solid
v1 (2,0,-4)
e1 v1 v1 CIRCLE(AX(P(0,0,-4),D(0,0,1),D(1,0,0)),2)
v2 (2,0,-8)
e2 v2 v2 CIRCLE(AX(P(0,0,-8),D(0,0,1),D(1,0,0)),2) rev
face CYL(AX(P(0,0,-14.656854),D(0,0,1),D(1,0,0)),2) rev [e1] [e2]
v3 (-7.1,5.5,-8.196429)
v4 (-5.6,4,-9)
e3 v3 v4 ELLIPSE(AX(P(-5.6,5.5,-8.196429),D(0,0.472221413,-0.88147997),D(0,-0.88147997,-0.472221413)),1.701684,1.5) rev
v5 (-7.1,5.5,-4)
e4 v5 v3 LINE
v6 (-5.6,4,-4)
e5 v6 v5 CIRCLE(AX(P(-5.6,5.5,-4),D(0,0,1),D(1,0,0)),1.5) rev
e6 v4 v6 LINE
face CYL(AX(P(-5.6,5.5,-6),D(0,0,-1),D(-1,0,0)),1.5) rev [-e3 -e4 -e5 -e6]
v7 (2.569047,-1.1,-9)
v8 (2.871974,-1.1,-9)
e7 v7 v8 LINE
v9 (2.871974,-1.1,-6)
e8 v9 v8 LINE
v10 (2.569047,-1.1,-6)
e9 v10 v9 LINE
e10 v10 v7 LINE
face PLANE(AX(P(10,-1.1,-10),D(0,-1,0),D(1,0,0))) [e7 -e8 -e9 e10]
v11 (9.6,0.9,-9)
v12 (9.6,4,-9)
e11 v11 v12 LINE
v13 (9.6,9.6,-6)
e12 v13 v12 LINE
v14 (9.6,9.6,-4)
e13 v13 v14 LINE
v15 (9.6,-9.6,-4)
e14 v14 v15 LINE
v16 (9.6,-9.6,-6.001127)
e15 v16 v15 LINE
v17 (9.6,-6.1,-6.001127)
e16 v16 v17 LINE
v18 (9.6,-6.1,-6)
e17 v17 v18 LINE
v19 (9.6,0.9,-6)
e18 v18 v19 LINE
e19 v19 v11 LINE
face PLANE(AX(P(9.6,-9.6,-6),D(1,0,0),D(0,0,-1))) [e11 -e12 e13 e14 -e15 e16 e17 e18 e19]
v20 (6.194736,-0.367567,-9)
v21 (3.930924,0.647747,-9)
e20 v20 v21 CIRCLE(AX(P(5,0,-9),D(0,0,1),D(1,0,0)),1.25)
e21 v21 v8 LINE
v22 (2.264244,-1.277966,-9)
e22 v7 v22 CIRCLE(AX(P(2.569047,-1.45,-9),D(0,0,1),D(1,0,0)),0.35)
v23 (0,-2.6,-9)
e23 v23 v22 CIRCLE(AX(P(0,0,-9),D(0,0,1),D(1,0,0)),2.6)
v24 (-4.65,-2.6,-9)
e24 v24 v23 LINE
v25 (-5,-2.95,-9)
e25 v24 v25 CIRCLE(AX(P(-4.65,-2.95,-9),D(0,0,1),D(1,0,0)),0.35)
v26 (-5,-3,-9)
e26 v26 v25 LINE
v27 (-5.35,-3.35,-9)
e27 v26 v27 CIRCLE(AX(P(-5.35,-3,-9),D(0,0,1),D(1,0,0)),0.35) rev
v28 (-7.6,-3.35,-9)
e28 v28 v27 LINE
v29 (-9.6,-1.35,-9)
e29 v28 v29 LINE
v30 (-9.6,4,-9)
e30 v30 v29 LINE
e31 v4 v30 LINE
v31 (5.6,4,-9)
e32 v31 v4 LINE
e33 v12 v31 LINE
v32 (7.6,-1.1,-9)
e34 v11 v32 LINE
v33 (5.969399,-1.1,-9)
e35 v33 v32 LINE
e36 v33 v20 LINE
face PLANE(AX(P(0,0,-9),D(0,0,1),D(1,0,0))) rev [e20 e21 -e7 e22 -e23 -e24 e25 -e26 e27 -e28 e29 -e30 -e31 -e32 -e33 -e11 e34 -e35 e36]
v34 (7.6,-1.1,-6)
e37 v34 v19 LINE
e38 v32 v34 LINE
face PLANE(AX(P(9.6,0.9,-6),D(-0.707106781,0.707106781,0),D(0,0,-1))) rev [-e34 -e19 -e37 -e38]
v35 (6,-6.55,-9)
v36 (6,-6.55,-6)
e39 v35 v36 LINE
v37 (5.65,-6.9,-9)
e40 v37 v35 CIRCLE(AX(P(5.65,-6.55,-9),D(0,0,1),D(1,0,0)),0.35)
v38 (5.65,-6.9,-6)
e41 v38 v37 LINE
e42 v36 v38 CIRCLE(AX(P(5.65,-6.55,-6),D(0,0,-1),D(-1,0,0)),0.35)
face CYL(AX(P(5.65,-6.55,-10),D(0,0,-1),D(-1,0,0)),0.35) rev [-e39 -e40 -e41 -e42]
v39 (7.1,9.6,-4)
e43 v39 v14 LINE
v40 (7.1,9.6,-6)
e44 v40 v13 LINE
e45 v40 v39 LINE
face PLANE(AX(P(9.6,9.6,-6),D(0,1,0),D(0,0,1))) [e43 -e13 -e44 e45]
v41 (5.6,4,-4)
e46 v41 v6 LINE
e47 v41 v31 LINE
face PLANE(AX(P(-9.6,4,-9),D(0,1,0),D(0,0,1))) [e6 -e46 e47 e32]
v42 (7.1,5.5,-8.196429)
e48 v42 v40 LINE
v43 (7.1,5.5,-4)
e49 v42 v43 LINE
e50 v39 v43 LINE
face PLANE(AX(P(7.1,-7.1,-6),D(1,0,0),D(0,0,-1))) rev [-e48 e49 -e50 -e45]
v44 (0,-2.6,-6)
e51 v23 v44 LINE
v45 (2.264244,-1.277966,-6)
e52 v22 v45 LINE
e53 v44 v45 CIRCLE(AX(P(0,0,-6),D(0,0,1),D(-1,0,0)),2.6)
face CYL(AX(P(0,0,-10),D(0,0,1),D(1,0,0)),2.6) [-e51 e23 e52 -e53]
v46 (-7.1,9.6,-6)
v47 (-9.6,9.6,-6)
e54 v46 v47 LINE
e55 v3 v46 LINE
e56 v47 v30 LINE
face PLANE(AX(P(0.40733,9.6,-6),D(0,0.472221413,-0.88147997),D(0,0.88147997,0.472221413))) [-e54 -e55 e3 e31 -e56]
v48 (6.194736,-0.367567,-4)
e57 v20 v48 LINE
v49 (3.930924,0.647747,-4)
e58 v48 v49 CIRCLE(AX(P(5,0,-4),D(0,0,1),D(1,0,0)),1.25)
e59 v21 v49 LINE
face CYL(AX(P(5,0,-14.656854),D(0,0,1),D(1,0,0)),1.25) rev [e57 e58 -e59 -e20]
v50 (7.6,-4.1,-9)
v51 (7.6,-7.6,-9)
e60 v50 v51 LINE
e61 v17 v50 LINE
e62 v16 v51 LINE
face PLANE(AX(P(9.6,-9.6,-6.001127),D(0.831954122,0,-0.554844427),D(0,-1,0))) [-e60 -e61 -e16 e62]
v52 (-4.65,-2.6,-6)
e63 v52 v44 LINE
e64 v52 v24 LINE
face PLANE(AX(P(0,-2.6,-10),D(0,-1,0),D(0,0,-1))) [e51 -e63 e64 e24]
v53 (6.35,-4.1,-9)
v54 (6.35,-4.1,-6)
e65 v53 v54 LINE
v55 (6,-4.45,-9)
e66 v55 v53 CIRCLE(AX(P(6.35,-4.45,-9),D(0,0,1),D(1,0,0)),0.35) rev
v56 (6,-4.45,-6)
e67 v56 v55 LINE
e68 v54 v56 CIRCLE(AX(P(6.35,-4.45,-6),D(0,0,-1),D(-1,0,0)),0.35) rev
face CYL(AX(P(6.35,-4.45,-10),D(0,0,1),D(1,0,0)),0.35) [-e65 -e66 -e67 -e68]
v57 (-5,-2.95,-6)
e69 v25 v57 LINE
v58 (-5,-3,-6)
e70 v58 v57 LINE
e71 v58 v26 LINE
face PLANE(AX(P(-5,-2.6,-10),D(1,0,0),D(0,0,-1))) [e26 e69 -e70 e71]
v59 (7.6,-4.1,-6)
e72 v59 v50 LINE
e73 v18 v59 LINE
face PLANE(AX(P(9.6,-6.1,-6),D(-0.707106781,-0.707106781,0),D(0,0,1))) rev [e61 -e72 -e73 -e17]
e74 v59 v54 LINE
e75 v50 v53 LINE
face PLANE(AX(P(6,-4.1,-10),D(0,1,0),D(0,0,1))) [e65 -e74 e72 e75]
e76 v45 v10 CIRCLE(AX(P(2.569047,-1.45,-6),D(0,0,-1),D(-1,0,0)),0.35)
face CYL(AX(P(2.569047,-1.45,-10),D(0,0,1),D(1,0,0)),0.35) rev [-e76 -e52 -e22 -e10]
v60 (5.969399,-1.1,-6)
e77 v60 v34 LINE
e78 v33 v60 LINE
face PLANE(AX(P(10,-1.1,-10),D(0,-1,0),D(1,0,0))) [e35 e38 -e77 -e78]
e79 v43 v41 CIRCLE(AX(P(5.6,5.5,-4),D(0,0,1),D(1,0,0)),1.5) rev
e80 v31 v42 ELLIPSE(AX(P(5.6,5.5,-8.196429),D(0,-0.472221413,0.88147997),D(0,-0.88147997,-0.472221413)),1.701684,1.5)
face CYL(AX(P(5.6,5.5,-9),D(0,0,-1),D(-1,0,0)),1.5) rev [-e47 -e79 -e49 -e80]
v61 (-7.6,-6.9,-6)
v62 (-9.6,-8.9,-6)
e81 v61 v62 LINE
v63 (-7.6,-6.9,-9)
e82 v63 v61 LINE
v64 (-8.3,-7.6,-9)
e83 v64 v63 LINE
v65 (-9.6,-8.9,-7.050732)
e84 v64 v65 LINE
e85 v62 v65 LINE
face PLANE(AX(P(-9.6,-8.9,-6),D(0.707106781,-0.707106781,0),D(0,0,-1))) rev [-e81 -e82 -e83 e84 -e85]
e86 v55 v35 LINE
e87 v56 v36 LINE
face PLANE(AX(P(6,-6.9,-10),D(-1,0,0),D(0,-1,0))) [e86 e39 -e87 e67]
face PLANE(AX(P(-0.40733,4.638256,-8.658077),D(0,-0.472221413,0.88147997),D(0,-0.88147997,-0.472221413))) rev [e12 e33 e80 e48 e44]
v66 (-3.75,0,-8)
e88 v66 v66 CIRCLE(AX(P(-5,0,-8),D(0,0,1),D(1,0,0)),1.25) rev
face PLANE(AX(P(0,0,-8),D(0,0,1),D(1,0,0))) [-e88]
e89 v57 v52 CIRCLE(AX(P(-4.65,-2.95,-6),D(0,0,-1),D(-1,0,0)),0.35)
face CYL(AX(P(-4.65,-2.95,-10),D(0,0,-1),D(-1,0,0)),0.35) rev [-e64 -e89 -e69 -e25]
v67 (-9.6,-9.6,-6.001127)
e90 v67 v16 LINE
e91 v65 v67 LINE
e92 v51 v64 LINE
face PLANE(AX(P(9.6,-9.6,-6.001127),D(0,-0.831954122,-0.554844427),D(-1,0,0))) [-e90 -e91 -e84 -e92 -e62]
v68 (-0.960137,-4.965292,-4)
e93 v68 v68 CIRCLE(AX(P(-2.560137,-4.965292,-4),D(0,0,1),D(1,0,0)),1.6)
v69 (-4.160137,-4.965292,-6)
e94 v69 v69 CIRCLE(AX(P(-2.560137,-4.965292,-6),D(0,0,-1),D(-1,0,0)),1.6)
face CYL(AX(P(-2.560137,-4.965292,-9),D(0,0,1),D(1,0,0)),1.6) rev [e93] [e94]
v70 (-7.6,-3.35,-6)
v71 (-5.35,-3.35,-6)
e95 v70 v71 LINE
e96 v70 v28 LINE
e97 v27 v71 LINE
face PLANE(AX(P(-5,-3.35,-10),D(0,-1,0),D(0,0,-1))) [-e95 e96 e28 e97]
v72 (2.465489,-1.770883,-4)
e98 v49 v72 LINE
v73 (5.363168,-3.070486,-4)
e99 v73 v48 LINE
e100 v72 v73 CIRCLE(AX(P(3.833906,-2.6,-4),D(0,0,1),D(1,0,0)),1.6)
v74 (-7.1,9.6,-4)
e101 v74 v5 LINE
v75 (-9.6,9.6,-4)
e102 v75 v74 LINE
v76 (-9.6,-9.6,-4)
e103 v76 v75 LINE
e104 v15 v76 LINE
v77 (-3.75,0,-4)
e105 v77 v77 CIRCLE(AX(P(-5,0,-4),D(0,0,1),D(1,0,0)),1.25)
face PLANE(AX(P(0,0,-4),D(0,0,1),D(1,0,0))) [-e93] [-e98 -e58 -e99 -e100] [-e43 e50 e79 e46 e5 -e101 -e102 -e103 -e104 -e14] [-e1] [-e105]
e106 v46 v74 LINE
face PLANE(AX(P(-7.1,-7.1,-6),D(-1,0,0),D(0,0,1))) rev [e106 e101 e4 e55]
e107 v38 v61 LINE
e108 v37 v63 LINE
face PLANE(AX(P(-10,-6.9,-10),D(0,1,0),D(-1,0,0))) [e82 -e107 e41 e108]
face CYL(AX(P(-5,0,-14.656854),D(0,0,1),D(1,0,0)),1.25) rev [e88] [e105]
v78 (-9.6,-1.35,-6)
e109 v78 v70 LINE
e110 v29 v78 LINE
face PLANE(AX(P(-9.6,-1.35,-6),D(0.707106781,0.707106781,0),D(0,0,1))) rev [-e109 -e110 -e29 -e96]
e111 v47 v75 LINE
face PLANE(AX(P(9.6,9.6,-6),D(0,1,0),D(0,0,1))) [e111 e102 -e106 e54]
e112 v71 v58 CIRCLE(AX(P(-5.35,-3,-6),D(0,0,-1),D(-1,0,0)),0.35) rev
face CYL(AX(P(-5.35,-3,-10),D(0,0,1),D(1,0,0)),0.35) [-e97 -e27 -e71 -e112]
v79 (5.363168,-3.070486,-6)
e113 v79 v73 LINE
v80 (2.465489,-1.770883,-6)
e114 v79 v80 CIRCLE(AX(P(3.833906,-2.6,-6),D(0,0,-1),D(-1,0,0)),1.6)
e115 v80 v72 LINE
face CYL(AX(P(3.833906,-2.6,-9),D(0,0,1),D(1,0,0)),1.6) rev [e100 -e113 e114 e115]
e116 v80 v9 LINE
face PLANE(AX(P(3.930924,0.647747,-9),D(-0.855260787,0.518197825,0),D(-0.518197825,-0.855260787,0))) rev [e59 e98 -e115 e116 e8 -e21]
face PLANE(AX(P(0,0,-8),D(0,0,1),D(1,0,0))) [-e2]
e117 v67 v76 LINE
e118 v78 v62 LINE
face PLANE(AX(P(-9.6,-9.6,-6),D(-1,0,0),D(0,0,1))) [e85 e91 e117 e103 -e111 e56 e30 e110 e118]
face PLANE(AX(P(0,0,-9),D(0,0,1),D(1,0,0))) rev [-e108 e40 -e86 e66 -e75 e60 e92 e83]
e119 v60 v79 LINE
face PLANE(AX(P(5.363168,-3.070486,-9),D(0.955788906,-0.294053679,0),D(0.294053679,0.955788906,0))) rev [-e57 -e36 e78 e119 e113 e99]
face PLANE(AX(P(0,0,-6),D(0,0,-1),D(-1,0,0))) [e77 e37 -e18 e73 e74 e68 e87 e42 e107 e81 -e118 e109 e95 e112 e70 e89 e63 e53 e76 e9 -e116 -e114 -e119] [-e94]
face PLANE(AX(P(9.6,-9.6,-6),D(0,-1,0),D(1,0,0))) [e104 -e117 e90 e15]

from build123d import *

# Parameters (mm, degrees)
OUTER_FRAME_EXTRUDE_DEPTH      = 5
OUTER_FRAME_EXTRUDE_DEPTH_BACK = 2
OUTSIDE_FRAME_W                = 19.2
OUTSIDE_FRAME_H                = 19.2
OUTSIDE_FRAME_W_2              = 14.2
OUTSIDE_FRAME_H_2              = 14.2
HOTSWAP_BASE_W                 = 19.2
HOTSWAP_BASE_H                 = 13.6
HOTSWAP_BASE_BLOCK_DEPTH       = 5
CUT_EXTRUDE4_DEPTH             = 17.288646353
CUT_EXTRUDE4_DEPTH_BACK        = 17.288646353
SKETCH1_W                      = 2
SKETCH1_H                      = 5.6
CUT_EXTRUDE1_DEPTH             = 4
SWITCH_PIN_HOLES_R             = 2
SWITCH_PIN_HOLES_R_2           = 1.25
SWITCH_HOLES_DEPTH             = 4
HOTSWAP_HOLES_R                = 1.6
CUT_EXTRUDE3_DEPTH             = 17.288646353
CHAMFER1_SIZE                  = 2
BOSS_EXTRUDE2_DEPTH            = 2.5
BOSS_EXTRUDE3_DEPTH            = 2.5
FILLET1_R                      = 0.35
FILLET2_R                      = 1.5
SPLIT1_START                   = -4
SPLIT1_OUTLINE_W               = 19.2
SPLIT1_OUTLINE_H               = 19.2
SPLIT1_OUTLINE_W_2             = 14.2
SPLIT1_OUTLINE_H_2             = 14.2
SPLIT1_DEPTH                   = 5
CHAMFER2_SIZE                  = 2
CHAMFER2_SIZE2                 = 2.998873489


# Read off the part's stored shape, not the designer's step: Split1
with BuildPart() as part:
    # Outside Frame → Outer Frame Extrude (new, two sides: drawn at the far end of the back side and taken through both)
    with BuildSketch(Plane.XY.offset(-4).offset(-OUTER_FRAME_EXTRUDE_DEPTH_BACK)):
        Rectangle(OUTSIDE_FRAME_W, OUTSIDE_FRAME_H)
        Rectangle(OUTSIDE_FRAME_W_2, OUTSIDE_FRAME_H_2, mode=Mode.SUBTRACT)
    extrude(amount=OUTER_FRAME_EXTRUDE_DEPTH + OUTER_FRAME_EXTRUDE_DEPTH_BACK)

    # Hotswap Base → Hotswap Base Block (add)
    with BuildSketch(Plane.XY.offset(-4)):
        with Locations((0, -2.8)):
            Rectangle(HOTSWAP_BASE_W, HOTSWAP_BASE_H)
    extrude(amount=-HOTSWAP_BASE_BLOCK_DEPTH)

    # Sketch1 → Cut-Extrude4 (cut, two sides: drawn at the far end of the back side and taken through both)
    with BuildSketch(Plane(origin=(0, 0, 0), x_dir=(0, 0, -1), z_dir=(1, 0, 0)).offset(-CUT_EXTRUDE4_DEPTH_BACK)):
        with Locations((5, 6.8)):
            Rectangle(SKETCH1_W, SKETCH1_H)
    extrude(amount=CUT_EXTRUDE4_DEPTH + CUT_EXTRUDE4_DEPTH_BACK, mode=Mode.SUBTRACT)

    # Hotswap Well → Cut-Extrude1 (cut)
    with BuildSketch(Plane(origin=(0, 0, -6), x_dir=(-1, 0, 0), z_dir=(0, 0, -1))):
        with BuildLine():
            Line((-10, -1.1), (-2.355843798, -1.1))
            ThreePointArc((-2.355843798, -1.1), (-1.396424004, -2.19317122), (0, -2.6))
            Line((0, -2.6), (5, -2.6))
            Line((5, -2.6), (5, -3.35))
            Line((5, -3.35), (10, -3.35))
            Line((10, -3.35), (10, -6.9))
            Line((10, -6.9), (-6, -6.9))
            Line((-6, -6.9), (-6, -4.1))
            Line((-6, -4.1), (-10, -4.1))
            Line((-10, -4.1), (-10, -1.1))
        make_face()
    extrude(amount=CUT_EXTRUDE1_DEPTH, mode=Mode.SUBTRACT)

    # Switch Pin Holes → Switch Holes (cut)
    with BuildSketch(Plane.XY.offset(-4)):
        Circle(SWITCH_PIN_HOLES_R)
        with Locations((-5, 0)):
            Circle(SWITCH_PIN_HOLES_R_2)
        with Locations((5, 0)):
            Circle(SWITCH_PIN_HOLES_R_2)
    extrude(amount=-SWITCH_HOLES_DEPTH, mode=Mode.SUBTRACT)

    # Hotswap Holes → Cut-Extrude3 (cut, through all)
    with BuildSketch(Plane.XY):
        with Locations((-2.560136595, -4.965291588)):
            Circle(HOTSWAP_HOLES_R)
        with BuildLine():
            Line((3.930924016, 0.647747281), (2.46548889, -1.77088348))
            ThreePointArc((2.46548889, -1.77088348), (3.179147124, -4.059894044), (5.3631684, -3.070485887))
            Line((5.3631684, -3.070485887), (6.194736133, -0.367567099))
            ThreePointArc((6.194736133, -0.367567099), (5.511530489, 1.140542222), (3.930924016, 0.647747281))
        make_face()
    extrude(amount=-CUT_EXTRUDE3_DEPTH, mode=Mode.SUBTRACT)

    # Chamfer1
    chamfer1_edges = [part.edges().sort_by_distance(p)[0] for p in [
        (9.6, -4.1, -7.5),
        (-9.6, -6.9, -7.5),
        (-9.6, -3.35, -7.5),
        (9.6, -1.1, -7.5),
    ]]
    chamfer(chamfer1_edges, length=CHAMFER1_SIZE)

    # Sketch2 → Boss-Extrude2 (add)
    with BuildSketch(Plane(origin=(9.6, 0, 0), x_dir=(0, 0, -1), z_dir=(1, 0, 0))):
        Polygon((6, 9.6), (9, 4), (4, 4), (4, 9.6), align=None)
    extrude(amount=-BOSS_EXTRUDE2_DEPTH)

    # Sketch3 → Boss-Extrude3 (add)
    with BuildSketch(Plane.ZY.offset(9.6)):
        Polygon((-4, 9.6), (-6, 9.6), (-9, 4), (-4, 4), align=None)
    extrude(amount=-BOSS_EXTRUDE3_DEPTH)

    # Fillet1
    fillet1_edges = [part.edges().sort_by_distance(p)[0] for p in [
        (6, -4.1, -7.5),
        (-5, -3.35, -7.5),
        (-5, -2.6, -7.5),
        (6, -6.9, -7.5),
        (2.355843798, -1.1, -7.5),
    ]]
    fillet(fillet1_edges, radius=FILLET1_R)

    # Fillet2
    fillet2_edges = [part.edges().sort_by_distance(p)[0] for p in [
        (7.1, 4, -6.5),
        (-7.1, 4, -6.5),
    ]]
    fillet(fillet2_edges, radius=FILLET2_R)

    # Split1 outline → Split1 (cut)
    with BuildSketch(Plane.XY.offset(SPLIT1_START)):
        Rectangle(SPLIT1_OUTLINE_W, SPLIT1_OUTLINE_H)
        Rectangle(SPLIT1_OUTLINE_W_2, SPLIT1_OUTLINE_H_2, mode=Mode.SUBTRACT)
    extrude(amount=SPLIT1_DEPTH, mode=Mode.SUBTRACT)

    # Chamfer2
    chamfer2_edges = [part.edges().sort_by_distance(p)[0] for p in [
        (9.6, -7.85, -9),
        (0, -9.6, -9),
    ]]
    chamfer2_side = [part.faces().sort_by_distance(p)[0] for p in [
        (1.357387596, -7.916485347, -9),
    ]]
    chamfer(chamfer2_edges, length=CHAMFER2_SIZE, length2=CHAMFER2_SIZE2, reference=chamfer2_side[0])


solid = part.part
